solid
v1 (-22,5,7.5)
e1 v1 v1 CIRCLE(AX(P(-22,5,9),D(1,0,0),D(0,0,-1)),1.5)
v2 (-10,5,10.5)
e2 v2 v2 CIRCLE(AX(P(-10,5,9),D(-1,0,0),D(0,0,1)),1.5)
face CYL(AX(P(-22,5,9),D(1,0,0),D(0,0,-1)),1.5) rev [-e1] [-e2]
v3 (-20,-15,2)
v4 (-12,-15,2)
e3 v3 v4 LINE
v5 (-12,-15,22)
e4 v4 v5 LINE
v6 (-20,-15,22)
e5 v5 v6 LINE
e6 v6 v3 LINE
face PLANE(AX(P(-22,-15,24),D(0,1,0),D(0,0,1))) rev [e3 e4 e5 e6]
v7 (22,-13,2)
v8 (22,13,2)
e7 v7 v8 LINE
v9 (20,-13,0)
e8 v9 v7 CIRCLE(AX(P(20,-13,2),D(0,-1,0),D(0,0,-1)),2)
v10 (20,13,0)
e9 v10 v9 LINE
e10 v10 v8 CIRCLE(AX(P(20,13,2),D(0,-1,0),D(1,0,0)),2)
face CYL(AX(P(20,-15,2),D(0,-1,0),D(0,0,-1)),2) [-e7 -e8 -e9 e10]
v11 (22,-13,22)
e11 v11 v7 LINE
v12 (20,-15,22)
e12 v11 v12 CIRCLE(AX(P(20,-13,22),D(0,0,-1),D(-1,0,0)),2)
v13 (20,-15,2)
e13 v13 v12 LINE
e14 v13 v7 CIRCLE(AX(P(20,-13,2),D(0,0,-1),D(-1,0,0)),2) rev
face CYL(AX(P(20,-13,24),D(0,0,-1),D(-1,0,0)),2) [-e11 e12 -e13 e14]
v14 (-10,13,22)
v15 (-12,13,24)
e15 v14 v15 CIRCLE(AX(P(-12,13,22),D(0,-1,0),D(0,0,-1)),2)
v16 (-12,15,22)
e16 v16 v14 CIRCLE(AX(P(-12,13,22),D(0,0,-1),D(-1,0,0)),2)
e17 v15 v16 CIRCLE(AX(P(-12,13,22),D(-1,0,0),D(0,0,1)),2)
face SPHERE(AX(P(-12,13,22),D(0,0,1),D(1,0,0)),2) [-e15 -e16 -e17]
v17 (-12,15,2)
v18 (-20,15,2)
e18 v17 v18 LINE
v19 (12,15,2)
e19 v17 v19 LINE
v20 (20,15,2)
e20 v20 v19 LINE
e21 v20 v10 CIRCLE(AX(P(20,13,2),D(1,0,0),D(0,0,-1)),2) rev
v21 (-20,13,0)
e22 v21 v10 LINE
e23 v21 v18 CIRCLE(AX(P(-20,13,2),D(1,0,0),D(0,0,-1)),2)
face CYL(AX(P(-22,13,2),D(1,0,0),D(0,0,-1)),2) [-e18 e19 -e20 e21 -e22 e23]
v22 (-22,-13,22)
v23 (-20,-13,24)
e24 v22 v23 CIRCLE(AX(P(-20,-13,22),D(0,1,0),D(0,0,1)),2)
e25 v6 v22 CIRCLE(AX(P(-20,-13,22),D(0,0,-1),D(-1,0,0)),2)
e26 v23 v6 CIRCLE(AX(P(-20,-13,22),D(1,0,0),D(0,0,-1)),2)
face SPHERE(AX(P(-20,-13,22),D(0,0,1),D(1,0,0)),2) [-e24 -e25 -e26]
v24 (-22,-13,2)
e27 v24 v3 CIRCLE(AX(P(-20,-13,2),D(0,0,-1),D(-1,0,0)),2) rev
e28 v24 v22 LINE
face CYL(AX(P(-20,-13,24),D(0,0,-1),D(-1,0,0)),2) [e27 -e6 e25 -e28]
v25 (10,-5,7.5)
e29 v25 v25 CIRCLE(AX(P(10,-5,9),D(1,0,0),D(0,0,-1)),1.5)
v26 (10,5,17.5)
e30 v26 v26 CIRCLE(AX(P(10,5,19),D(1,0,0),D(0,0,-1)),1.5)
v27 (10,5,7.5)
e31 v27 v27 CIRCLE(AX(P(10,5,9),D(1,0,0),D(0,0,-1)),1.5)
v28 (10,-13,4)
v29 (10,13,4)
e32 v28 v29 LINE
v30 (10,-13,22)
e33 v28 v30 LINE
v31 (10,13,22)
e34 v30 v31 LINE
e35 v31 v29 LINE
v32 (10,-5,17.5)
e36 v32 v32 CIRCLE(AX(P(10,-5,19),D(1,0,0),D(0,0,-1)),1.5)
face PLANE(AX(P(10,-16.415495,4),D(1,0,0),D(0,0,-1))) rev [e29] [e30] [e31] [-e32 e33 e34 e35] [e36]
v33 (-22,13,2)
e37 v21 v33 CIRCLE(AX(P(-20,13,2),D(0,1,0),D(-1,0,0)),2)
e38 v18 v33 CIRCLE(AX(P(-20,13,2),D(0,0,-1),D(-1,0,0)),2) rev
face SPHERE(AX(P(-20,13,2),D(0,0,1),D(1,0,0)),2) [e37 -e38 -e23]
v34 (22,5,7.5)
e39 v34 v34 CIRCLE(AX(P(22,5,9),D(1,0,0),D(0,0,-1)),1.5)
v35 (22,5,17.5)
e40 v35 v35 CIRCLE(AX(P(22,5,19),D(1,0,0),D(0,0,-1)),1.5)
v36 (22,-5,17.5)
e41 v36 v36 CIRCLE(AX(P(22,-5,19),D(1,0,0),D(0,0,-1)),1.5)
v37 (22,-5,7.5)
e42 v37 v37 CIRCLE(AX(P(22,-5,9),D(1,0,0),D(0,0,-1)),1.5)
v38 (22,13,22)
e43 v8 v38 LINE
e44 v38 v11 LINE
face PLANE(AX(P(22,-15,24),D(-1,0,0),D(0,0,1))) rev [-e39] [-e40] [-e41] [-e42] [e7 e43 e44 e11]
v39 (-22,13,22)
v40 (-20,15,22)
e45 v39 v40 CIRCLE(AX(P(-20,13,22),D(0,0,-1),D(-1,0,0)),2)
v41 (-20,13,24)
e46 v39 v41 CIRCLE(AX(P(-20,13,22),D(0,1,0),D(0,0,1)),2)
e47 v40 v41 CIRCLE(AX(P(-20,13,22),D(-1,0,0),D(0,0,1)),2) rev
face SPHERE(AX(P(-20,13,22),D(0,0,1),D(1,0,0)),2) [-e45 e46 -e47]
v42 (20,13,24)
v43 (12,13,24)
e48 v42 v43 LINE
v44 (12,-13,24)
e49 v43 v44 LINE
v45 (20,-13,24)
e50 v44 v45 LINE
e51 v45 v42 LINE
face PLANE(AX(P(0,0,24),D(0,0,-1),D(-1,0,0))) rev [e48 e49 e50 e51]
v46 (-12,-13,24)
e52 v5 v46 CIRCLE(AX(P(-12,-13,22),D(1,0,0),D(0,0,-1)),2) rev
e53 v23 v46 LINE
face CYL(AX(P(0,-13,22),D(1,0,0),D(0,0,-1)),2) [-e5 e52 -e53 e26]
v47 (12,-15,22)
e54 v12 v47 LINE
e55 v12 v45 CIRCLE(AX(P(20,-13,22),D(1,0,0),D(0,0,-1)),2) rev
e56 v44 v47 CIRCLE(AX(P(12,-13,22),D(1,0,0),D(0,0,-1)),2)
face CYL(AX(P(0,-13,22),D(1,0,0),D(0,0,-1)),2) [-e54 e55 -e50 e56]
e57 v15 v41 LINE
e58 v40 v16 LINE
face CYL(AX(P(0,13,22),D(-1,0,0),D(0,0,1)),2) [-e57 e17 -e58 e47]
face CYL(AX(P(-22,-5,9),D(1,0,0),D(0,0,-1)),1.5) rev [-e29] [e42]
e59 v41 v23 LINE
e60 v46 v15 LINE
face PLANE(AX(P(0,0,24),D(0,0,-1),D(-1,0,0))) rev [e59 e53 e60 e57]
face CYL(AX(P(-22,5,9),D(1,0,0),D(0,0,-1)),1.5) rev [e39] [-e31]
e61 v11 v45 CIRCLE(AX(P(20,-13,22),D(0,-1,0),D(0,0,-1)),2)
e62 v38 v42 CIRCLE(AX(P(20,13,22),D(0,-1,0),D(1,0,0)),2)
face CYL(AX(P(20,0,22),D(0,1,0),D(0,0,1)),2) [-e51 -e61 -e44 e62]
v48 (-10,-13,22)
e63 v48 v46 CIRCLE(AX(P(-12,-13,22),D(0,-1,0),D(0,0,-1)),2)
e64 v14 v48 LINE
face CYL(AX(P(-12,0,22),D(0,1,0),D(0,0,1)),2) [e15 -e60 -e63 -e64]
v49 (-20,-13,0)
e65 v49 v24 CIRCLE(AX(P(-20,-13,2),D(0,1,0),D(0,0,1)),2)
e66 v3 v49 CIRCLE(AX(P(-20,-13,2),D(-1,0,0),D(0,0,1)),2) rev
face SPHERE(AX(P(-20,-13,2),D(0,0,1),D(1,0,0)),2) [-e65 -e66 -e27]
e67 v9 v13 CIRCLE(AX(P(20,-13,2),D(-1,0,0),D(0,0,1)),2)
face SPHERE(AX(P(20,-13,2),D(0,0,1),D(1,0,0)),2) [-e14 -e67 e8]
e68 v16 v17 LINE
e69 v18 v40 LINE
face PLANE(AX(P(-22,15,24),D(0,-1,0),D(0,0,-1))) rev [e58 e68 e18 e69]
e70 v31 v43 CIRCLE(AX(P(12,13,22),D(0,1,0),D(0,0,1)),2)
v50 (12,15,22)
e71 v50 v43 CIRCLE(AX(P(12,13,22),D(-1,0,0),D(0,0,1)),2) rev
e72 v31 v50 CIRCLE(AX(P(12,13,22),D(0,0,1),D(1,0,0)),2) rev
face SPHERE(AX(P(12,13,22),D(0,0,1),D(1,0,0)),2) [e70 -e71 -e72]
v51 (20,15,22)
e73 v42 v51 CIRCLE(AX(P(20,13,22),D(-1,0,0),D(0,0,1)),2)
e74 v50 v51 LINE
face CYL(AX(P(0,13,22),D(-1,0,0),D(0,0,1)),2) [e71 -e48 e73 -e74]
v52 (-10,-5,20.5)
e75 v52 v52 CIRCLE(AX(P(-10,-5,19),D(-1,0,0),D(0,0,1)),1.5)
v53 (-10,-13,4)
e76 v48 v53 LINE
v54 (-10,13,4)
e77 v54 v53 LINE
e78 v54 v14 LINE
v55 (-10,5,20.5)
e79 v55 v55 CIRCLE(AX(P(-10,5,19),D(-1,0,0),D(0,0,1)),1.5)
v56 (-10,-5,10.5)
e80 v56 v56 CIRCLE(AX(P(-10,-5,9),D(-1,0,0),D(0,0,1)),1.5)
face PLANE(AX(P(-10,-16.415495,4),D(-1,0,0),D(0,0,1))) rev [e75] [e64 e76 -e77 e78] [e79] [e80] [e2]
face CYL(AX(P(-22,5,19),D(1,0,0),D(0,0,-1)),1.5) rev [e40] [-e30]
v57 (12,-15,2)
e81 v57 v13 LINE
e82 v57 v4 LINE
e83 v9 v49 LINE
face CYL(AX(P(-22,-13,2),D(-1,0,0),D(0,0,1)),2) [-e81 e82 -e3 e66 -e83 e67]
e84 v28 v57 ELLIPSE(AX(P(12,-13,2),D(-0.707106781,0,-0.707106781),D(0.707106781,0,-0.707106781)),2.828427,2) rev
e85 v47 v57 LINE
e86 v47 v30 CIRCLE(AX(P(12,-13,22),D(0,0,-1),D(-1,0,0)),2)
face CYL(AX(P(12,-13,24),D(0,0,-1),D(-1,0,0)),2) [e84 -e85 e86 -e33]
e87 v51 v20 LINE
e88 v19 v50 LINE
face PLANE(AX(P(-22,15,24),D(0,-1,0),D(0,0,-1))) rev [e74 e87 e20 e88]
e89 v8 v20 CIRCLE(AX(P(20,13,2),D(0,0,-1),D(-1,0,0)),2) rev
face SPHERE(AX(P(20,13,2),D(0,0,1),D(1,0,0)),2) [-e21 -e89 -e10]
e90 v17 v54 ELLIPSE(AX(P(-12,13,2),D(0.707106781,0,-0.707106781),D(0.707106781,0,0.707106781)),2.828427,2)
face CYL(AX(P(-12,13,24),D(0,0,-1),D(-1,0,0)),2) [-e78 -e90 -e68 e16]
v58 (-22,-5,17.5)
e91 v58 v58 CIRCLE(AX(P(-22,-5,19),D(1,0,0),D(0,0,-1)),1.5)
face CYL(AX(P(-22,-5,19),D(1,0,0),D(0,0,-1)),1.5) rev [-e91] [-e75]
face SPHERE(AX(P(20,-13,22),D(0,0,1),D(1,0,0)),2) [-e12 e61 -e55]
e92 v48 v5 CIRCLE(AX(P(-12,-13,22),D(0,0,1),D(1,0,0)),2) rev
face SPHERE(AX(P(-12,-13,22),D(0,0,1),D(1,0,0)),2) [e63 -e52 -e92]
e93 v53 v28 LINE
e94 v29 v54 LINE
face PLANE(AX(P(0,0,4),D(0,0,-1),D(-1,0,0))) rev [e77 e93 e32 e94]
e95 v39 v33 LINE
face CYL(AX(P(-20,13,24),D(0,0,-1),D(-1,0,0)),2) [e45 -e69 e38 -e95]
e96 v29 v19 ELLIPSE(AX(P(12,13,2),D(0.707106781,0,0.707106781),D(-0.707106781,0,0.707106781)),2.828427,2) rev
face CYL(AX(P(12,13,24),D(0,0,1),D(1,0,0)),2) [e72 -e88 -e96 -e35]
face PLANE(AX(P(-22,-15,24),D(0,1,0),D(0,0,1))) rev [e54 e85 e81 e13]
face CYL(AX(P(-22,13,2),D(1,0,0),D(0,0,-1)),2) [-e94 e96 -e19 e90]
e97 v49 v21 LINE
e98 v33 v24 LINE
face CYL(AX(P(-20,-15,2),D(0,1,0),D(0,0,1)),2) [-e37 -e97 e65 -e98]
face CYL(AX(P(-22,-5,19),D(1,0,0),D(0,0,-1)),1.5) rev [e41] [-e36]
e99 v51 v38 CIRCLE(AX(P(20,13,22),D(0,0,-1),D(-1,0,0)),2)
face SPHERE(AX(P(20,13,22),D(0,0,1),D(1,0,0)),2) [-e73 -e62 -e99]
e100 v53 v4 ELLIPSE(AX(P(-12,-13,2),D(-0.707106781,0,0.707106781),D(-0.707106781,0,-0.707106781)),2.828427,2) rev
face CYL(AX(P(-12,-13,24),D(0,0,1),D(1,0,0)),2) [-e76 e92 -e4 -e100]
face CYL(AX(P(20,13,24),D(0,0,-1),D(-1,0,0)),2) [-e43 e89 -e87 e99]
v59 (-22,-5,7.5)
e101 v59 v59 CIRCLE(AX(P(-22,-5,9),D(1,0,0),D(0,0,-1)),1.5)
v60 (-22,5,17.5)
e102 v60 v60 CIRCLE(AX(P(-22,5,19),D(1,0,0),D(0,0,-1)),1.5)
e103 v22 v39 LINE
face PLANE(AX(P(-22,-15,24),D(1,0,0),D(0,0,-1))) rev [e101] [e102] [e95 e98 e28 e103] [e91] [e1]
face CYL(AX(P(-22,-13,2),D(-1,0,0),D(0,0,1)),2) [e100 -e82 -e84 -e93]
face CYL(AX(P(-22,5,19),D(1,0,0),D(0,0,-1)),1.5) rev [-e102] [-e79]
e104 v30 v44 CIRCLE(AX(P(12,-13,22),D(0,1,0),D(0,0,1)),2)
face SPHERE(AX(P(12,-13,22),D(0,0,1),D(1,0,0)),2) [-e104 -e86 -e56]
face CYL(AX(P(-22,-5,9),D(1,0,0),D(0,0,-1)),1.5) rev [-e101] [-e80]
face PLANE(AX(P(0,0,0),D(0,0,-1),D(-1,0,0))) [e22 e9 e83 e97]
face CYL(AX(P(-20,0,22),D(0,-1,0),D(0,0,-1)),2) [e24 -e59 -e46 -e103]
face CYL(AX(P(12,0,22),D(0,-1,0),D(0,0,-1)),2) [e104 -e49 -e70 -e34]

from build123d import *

# Parameters (mm, degrees)
SKETCH_1_W          = 44
SKETCH_1_H          = 30
EXTRUDE_1_DEPTH     = 24
SKETCH_5_W          = 20
SKETCH_5_H          = 34.070761632
CUT_EXTRUDE_3_DEPTH = 20
SKETCH_6_R          = 1.5
CUT_EXTRUDE_4_DEPTH = 44
FILLET_1_R          = 2
FILLET_2_R          = 2


# Some blends are built 0.0001 mm under size
with BuildPart() as part:
    # 草图1 → 凸台-拉伸1 (new body)
    with BuildSketch(Plane.XY):
        Rectangle(SKETCH_1_W, SKETCH_1_H)
    extrude(amount=EXTRUDE_1_DEPTH)

    # 草图5 → 切除-拉伸3 (cut)
    with BuildSketch(Plane.XY.offset(24)):
        with Locations((0, 0.619885825)):
            Rectangle(SKETCH_5_W, SKETCH_5_H)
    extrude(amount=-CUT_EXTRUDE_3_DEPTH, mode=Mode.SUBTRACT)

    # 草图6 → 切除-拉伸4 (cut)
    with BuildSketch(Plane(origin=(22, 0, 0), x_dir=(0, 0, -1), z_dir=(1, 0, 0))):
        with Locations((-19, 5)):
            Circle(SKETCH_6_R)
        with Locations((-19, -5)):
            Circle(SKETCH_6_R)
        with Locations((-9, -5)):
            Circle(SKETCH_6_R)
        with Locations((-9, 5)):
            Circle(SKETCH_6_R)
    extrude(amount=-CUT_EXTRUDE_4_DEPTH, mode=Mode.SUBTRACT)

    # 圆角1
    fillet_1_edges = [part.edges().sort_by_distance(p)[0] for p in [
        (-16, -15, 24),
        (-16, 15, 24),
        (16, -15, 24),
        (0, -15, 4),
        (0, 15, 4),
        (-10, 15, 14),
        (-10, -15, 14),
        (10, 15, 14),
        (10, -15, 14),
        (0, -15, 0),
        (0, 15, 0),
        (16, 15, 24),
        (22, -15, 12),
        (-22, -15, 12),
        (-22, 15, 12),
        (22, 15, 12),
    ]]
    fillet(fillet_1_edges, radius=FILLET_1_R - 0.0001)  # a hair under: the kernel refuses the full size

    # 圆角2
    # the kernel refuses this fillet: 2 mm, written as the material it takes off along each edge
    with BuildSketch(Plane(origin=(-12, -15, 22), x_dir=(1, 0, 0), z_dir=(0, 0, -1))) as fillet_2_piece_1:
        with BuildLine():
            CenterArc((0.0001, -1.9999), 1.9999, 0, 90)
            Line((2, -1.9999), (2, 0))
            Line((2, 0), (0.0001, 0))
        make_face()
    revolve(axis=Axis((-12, -15, 22), (0, -1, 0)), revolution_arc=90, mode=Mode.SUBTRACT)
    with BuildSketch(Plane(origin=(-20, -15, 22), x_dir=(0, 0, 1), z_dir=(1, 0, 0))) as fillet_2_piece_2:
        with BuildLine():
            CenterArc((0.0001, -1.9999), 1.9999, 0, 90)
            Line((2, -1.9999), (2, 0))
            Line((2, 0), (0.0001, 0))
        make_face()
    revolve(axis=Axis((-20, -15, 22), (0, -1, 0)), revolution_arc=90, mode=Mode.SUBTRACT)
    with BuildSketch(Plane(origin=(-20, -15, 2), x_dir=(-1, 0, 0), z_dir=(0, 0, 1))) as fillet_2_piece_3:
        with BuildLine():
            CenterArc((0.0001, -1.9999), 1.9999, 0, 90)
            Line((2, -1.9999), (2, 0))
            Line((2, 0), (0.0001, 0))
        make_face()
    revolve(axis=Axis((-20, -15, 2), (0, -1, 0)), revolution_arc=90, mode=Mode.SUBTRACT)
    with BuildSketch(Plane(origin=(20, -15, 2), x_dir=(0, 0, -1), z_dir=(-1, 0, 0))) as fillet_2_piece_4:
        with BuildLine():
            CenterArc((0.0001, -1.9999), 1.9999, 0, 90)
            Line((2, -1.9999), (2, 0))
            Line((2, 0), (0.0001, 0))
        make_face()
    revolve(axis=Axis((20, -15, 2), (0, -1, 0)), revolution_arc=90, mode=Mode.SUBTRACT)
    with BuildSketch(Plane(origin=(12, -15, 22), x_dir=(0, 0, 1), z_dir=(1, 0, 0))) as fillet_2_piece_5:
        with BuildLine():
            CenterArc((0.0001, -1.9999), 1.9999, 0, 90)
            Line((2, -1.9999), (2, 0))
            Line((2, 0), (0.0001, 0))
        make_face()
    revolve(axis=Axis((12, -15, 22), (0, -1, 0)), revolution_arc=90, mode=Mode.SUBTRACT)
    with BuildSketch(Plane(origin=(20, -15, 22), x_dir=(1, 0, 0), z_dir=(0, 0, -1))) as fillet_2_piece_6:
        with BuildLine():
            CenterArc((0.0001, -1.9999), 1.9999, 0, 90)
            Line((2, -1.9999), (2, 0))
            Line((2, 0), (0.0001, 0))
        make_face()
    revolve(axis=Axis((20, -15, 22), (0, -1, 0)), revolution_arc=90, mode=Mode.SUBTRACT)
    with BuildSketch(Plane(origin=(12, 15, 22), x_dir=(-1, 0, 0), z_dir=(0, 0, -1))) as fillet_2_piece_7:
        with BuildLine():
            CenterArc((0.0001, -1.9999), 1.9999, 0, 90)
            Line((2, -1.9999), (2, 0))
            Line((2, 0), (0.0001, 0))
        make_face()
    revolve(axis=Axis((12, 15, 22), (0, 1, 0)), revolution_arc=90, mode=Mode.SUBTRACT)
    with BuildSketch(Plane(origin=(20, 15, 22), x_dir=(0, 0, 1), z_dir=(-1, 0, 0))) as fillet_2_piece_8:
        with BuildLine():
            CenterArc((0.0001, -1.9999), 1.9999, 0, 90)
            Line((2, -1.9999), (2, 0))
            Line((2, 0), (0.0001, 0))
        make_face()
    revolve(axis=Axis((20, 15, 22), (0, 1, 0)), revolution_arc=90, mode=Mode.SUBTRACT)
    with BuildSketch(Plane(origin=(-12, 15, 22), x_dir=(0, 0, 1), z_dir=(-1, 0, 0))) as fillet_2_piece_9:
        with BuildLine():
            CenterArc((0.0001, -1.9999), 1.9999, 0, 90)
            Line((2, -1.9999), (2, 0))
            Line((2, 0), (0.0001, 0))
        make_face()
    revolve(axis=Axis((-12, 15, 22), (0, 1, 0)), revolution_arc=90, mode=Mode.SUBTRACT)
    with BuildSketch(Plane(origin=(20, 15, 2), x_dir=(1, 0, 0), z_dir=(0, 0, 1))) as fillet_2_piece_10:
        with BuildLine():
            CenterArc((0.0001, -1.9999), 1.9999, 0, 90)
            Line((2, -1.9999), (2, 0))
            Line((2, 0), (0.0001, 0))
        make_face()
    revolve(axis=Axis((20, 15, 2), (0, 1, 0)), revolution_arc=90, mode=Mode.SUBTRACT)
    with BuildSketch(Plane(origin=(-20, 15, 22), x_dir=(-1, 0, 0), z_dir=(0, 0, -1))) as fillet_2_piece_11:
        with BuildLine():
            CenterArc((0.0001, -1.9999), 1.9999, 0, 90)
            Line((2, -1.9999), (2, 0))
            Line((2, 0), (0.0001, 0))
        make_face()
    revolve(axis=Axis((-20, 15, 22), (0, 1, 0)), revolution_arc=90, mode=Mode.SUBTRACT)
    with BuildSketch(Plane(origin=(-20, 15, 2), x_dir=(0, 0, -1), z_dir=(1, 0, 0))) as fillet_2_piece_12:
        with BuildLine():
            CenterArc((0.0001, -1.9999), 1.9999, 0, 90)
            Line((2, -1.9999), (2, 0))
            Line((2, 0), (0.0001, 0))
        make_face()
    revolve(axis=Axis((-20, 15, 2), (0, 1, 0)), revolution_arc=90, mode=Mode.SUBTRACT)
    with BuildSketch(Plane(origin=(-22, 15, 0), x_dir=(0, 0, 1), z_dir=(0, -1, 0)), Plane(origin=(-22, 15, 24), x_dir=(1, 0, 0), z_dir=(0, -1, 0)), Plane(origin=(10, -15, 24), x_dir=(0, 0, -1), z_dir=(0, 1, 0))) as fillet_2_piece_13:
        with BuildLine():
            CenterArc((FILLET_2_R, -FILLET_2_R), FILLET_2_R, 90, 90)
            Line((0, -FILLET_2_R), (0, 0))
            Line((0, 0), (FILLET_2_R, 0))
        make_face()
    extrude(amount=30, mode=Mode.SUBTRACT)
    with BuildSketch(Plane(origin=(22, -15, 0), x_dir=(-1, 0, 0), z_dir=(0, 1, 0)), Plane(origin=(22, -15, 24), x_dir=(0, 0, -1), z_dir=(0, 1, 0)), Plane(origin=(-10, 15, 24), x_dir=(-1, 0, 0), z_dir=(0, -1, 0))) as fillet_2_piece_14:
        with BuildLine():
            CenterArc((FILLET_2_R, FILLET_2_R), FILLET_2_R, 180, 90)
            Line((0, FILLET_2_R), (0, 0))
            Line((0, 0), (FILLET_2_R, 0))
        make_face()
    extrude(amount=30, mode=Mode.SUBTRACT)


solid = part.part
